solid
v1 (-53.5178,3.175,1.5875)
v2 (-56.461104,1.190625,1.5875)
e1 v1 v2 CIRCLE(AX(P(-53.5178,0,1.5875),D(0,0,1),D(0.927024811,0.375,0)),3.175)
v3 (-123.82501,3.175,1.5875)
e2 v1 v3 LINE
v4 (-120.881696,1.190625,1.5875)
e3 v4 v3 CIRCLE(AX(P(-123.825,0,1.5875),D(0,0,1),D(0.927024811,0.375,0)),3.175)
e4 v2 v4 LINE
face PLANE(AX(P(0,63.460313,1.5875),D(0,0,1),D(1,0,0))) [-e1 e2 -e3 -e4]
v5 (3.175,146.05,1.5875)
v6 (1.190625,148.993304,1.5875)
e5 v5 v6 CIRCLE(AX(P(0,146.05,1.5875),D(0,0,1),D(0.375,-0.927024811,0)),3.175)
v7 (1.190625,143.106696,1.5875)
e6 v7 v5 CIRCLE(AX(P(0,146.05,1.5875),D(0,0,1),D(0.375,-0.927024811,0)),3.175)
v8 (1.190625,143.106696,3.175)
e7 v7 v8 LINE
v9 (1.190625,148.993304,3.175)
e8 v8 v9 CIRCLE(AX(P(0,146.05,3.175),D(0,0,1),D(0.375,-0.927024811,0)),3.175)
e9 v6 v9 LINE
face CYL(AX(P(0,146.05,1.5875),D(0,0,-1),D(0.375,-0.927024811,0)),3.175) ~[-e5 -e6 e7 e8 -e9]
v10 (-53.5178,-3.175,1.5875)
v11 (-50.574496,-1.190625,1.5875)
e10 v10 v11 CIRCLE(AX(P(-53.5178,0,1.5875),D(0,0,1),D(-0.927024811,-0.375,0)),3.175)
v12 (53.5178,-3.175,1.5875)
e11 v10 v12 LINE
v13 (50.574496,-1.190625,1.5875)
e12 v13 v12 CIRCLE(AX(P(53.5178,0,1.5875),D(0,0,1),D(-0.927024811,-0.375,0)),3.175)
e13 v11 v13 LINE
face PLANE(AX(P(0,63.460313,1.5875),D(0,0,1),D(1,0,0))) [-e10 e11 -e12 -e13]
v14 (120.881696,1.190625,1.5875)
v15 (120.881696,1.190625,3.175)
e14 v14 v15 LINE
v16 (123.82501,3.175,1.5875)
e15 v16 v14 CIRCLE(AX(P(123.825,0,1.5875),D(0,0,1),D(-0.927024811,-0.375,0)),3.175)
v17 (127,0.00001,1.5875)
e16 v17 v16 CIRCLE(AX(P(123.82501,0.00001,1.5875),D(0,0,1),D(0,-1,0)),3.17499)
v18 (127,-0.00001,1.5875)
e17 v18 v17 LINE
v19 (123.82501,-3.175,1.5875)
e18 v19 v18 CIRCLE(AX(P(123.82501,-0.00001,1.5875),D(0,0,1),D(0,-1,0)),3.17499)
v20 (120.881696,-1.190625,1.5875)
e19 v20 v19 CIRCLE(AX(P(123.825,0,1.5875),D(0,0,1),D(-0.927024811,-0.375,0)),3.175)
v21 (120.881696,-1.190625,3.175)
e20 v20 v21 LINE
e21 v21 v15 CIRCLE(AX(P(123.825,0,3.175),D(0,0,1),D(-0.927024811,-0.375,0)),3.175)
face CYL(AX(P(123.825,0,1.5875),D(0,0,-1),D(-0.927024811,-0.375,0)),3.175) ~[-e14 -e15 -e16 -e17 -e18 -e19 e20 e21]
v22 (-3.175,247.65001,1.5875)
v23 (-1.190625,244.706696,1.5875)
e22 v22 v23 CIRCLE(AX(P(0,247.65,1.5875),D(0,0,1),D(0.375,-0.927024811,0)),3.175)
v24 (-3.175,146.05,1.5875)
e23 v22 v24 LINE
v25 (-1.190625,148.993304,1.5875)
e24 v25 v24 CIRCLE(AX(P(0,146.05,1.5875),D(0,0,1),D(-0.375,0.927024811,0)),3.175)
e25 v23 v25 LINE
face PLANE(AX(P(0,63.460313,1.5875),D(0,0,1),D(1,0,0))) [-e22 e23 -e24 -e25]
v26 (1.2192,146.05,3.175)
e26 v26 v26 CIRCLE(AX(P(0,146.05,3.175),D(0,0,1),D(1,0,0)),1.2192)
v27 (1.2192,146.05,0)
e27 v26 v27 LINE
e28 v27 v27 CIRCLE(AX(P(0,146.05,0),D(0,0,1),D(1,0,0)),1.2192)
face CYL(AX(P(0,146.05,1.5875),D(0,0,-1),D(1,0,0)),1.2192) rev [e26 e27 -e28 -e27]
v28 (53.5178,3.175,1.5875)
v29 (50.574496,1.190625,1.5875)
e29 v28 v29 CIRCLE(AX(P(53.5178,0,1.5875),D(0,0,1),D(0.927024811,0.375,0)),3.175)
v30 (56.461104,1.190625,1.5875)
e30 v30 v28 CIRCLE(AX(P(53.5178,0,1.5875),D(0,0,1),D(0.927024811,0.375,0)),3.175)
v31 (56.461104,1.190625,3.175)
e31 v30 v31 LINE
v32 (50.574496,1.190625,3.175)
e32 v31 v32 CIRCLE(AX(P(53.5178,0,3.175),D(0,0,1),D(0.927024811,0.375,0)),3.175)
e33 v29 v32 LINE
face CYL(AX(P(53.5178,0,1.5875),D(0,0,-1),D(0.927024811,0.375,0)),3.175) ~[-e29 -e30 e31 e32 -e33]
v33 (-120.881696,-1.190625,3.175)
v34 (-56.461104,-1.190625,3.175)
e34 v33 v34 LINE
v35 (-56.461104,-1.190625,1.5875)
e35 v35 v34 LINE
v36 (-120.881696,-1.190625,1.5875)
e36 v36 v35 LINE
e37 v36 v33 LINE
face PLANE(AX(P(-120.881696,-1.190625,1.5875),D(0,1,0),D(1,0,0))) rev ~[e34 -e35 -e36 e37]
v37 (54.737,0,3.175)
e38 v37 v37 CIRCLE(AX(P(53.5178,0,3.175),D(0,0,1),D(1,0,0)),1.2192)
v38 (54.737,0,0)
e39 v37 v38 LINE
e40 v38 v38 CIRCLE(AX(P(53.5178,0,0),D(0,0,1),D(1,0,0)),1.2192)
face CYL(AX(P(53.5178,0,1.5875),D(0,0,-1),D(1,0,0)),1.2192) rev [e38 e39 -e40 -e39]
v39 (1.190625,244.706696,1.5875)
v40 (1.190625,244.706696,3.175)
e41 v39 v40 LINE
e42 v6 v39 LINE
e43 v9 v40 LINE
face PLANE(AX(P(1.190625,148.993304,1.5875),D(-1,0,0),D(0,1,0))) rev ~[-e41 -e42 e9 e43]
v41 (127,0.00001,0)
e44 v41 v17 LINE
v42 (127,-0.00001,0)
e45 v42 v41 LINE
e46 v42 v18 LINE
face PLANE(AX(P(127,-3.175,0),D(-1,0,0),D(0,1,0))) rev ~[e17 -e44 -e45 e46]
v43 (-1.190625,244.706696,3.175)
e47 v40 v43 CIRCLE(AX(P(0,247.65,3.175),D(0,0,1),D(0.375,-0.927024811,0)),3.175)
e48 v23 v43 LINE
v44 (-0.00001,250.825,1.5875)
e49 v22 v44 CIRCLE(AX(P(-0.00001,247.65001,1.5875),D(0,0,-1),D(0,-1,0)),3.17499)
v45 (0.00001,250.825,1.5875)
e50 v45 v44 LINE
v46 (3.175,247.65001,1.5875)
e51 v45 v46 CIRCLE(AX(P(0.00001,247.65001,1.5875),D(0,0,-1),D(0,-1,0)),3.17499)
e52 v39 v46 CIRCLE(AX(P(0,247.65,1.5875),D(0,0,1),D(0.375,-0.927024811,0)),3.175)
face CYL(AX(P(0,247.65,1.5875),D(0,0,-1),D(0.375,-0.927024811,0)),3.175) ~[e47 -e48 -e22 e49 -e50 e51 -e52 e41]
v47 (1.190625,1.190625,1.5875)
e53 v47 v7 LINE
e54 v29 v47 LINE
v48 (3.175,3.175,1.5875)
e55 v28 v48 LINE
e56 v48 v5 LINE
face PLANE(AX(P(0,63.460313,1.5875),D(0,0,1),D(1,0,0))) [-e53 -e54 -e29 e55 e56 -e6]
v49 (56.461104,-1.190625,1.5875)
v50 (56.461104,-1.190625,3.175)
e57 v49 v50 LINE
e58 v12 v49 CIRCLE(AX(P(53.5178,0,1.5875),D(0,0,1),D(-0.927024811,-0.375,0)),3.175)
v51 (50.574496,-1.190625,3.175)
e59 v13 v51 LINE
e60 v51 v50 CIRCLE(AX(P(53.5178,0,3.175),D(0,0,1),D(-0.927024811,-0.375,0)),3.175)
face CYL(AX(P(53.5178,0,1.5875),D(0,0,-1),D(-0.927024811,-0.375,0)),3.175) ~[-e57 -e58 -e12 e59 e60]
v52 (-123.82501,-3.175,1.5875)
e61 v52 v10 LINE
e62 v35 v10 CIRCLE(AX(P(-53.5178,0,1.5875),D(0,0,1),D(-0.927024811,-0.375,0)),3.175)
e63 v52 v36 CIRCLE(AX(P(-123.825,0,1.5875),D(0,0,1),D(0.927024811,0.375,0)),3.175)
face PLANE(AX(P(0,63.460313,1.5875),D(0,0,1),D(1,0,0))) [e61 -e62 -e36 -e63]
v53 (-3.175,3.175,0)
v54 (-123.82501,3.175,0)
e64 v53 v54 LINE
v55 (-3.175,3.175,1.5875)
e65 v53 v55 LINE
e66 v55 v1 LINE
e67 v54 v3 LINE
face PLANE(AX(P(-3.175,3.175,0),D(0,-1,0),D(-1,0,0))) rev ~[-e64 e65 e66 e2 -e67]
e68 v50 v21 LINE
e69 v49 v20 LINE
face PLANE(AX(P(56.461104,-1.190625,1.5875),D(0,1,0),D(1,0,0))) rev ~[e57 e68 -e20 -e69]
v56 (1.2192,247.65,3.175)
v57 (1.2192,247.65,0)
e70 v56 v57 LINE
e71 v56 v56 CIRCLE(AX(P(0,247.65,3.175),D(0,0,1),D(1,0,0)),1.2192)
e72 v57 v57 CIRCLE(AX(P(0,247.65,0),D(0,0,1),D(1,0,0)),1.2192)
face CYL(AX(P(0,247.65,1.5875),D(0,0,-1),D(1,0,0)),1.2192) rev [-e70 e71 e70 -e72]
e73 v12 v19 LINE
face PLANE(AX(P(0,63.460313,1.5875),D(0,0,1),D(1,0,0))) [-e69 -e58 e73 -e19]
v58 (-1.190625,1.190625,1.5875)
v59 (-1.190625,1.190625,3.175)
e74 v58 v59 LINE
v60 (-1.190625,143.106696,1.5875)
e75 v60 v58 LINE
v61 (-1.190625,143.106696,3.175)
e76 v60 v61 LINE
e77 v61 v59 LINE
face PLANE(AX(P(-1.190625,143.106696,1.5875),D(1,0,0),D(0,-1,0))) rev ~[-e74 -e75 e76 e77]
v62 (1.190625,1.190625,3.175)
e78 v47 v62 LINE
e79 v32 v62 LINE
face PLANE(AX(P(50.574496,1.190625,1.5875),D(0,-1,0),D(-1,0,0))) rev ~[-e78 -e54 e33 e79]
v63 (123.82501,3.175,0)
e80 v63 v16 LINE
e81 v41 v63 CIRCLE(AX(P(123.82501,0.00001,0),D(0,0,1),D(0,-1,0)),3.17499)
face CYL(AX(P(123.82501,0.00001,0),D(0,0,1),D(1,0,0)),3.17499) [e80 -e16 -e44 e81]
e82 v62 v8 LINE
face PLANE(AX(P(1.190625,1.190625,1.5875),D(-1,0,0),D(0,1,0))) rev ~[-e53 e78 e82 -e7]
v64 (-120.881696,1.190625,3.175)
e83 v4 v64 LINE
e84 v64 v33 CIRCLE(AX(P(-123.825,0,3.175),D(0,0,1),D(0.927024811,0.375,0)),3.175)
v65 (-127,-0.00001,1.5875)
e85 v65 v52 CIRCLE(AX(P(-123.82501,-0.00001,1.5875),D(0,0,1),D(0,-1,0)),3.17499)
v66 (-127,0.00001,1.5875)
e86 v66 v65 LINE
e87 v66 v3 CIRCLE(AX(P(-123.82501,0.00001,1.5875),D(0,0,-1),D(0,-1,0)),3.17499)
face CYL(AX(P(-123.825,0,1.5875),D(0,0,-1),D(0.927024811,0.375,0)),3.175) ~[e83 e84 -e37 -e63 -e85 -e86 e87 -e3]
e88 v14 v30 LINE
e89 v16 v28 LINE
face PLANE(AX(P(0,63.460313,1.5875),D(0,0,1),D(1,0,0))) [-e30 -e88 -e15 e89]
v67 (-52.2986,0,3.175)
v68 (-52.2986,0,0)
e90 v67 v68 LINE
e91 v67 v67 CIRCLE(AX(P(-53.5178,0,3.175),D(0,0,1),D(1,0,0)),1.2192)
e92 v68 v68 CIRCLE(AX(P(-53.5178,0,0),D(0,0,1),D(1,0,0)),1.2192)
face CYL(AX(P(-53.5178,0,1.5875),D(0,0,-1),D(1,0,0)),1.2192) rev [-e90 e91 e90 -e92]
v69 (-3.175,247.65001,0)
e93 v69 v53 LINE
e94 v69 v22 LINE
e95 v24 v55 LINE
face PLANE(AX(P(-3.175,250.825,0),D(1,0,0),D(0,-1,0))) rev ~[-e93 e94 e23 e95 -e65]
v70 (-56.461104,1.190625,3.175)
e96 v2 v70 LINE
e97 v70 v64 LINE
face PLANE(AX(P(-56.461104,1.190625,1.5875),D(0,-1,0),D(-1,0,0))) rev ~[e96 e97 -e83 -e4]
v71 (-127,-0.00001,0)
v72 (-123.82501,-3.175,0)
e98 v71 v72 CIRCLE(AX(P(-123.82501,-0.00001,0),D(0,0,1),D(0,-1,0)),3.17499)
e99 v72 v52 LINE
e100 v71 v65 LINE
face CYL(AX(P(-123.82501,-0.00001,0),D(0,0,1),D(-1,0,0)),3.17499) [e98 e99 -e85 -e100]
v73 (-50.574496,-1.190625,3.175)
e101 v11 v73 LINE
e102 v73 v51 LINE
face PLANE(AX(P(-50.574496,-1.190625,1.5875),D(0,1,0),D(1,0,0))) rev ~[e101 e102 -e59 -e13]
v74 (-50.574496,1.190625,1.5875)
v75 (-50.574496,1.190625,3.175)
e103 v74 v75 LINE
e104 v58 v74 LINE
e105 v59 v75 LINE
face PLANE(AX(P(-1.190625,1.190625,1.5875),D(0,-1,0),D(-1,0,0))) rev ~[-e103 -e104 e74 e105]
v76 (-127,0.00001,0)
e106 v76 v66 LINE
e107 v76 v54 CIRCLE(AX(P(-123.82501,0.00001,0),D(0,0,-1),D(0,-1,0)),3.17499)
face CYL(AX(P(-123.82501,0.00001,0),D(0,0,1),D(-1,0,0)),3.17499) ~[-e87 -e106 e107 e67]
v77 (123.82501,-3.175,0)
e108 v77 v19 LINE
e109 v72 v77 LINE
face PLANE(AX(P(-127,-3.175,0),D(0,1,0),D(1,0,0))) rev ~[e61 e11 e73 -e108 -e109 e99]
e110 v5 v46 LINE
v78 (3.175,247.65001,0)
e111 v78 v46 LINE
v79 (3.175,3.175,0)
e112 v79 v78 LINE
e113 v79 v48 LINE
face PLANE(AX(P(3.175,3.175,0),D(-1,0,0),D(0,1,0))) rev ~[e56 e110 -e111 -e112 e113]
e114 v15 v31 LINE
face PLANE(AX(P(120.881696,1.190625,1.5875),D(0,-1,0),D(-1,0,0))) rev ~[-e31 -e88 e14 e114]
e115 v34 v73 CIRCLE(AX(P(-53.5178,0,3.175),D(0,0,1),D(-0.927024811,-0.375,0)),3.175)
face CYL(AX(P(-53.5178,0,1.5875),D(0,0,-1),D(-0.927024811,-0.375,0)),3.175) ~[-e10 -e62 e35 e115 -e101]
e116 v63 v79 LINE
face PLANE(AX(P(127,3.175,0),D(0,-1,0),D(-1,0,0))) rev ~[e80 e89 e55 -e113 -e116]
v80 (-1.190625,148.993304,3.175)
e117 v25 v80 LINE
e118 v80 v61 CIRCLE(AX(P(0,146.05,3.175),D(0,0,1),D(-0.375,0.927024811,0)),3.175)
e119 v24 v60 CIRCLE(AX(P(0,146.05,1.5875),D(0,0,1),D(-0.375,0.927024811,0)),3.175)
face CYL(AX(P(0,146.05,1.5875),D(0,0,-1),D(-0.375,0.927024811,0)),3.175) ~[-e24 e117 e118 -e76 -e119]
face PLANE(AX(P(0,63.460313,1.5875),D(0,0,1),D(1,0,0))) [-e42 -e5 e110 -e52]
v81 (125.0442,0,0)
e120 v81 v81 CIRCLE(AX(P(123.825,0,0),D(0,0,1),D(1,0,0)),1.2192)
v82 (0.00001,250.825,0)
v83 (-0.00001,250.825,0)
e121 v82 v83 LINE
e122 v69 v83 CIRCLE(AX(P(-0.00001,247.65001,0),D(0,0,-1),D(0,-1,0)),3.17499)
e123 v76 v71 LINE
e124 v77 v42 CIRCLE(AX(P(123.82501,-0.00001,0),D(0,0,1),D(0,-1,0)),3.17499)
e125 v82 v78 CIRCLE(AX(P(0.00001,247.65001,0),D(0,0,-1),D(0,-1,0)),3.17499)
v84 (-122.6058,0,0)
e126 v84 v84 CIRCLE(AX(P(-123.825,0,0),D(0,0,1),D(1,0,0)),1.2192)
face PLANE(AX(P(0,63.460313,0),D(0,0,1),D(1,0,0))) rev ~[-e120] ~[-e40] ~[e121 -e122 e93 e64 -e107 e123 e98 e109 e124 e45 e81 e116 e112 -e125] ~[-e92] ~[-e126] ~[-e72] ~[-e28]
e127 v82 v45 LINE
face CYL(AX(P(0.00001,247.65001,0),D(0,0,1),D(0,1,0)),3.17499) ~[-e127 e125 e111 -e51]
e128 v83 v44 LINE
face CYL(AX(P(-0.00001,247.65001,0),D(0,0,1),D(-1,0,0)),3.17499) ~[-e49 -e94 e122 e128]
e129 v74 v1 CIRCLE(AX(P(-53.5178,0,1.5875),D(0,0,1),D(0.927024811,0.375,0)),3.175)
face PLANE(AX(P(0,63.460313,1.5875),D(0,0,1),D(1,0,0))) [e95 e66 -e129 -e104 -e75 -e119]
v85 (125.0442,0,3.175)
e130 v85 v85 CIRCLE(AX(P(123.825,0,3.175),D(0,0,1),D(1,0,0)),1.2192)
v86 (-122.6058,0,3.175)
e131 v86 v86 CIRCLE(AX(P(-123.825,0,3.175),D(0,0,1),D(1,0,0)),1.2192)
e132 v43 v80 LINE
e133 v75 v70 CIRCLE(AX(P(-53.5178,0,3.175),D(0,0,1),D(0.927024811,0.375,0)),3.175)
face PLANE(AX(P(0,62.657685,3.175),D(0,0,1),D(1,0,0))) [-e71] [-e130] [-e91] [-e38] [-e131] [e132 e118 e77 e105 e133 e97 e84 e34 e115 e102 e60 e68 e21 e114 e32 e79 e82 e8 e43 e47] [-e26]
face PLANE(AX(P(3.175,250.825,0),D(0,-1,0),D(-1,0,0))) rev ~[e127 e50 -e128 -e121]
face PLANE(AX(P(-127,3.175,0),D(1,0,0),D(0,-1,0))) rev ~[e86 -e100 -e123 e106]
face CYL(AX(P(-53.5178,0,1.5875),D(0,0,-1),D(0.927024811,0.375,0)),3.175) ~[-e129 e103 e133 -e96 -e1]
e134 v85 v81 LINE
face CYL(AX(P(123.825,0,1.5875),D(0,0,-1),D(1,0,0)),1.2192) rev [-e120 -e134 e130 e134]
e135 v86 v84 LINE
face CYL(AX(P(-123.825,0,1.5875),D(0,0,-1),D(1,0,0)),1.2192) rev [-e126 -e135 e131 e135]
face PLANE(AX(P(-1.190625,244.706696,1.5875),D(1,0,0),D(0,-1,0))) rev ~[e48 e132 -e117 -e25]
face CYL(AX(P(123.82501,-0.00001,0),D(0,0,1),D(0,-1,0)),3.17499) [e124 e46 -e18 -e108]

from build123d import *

# Parameters (mm, degrees)
F0_R     = 1.2192
F1_DEPTH = 1.5875
F2_R     = 3.17499
F3_R     = 1.2192
F4_DEPTH = 1.5875


# Not quite as in the source:
# - a fillet or chamfer is up to 0.001 mm smaller than in the source, because OpenCascade refuses the exact size


with BuildPart() as f1:
    # F0 (on Top) → F1 (new body)
    with BuildSketch(Plane.XY):
        Polygon((-127, 3.175), (-127, -3.175), (127, -3.175), (127, 3.175), (3.175, 3.175), (3.175, 250.825), (-3.175, 250.825), (-3.175, 3.175), align=None)
        with Locations((-123.825, 0)):
            Circle(F0_R, mode=Mode.SUBTRACT)
        with Locations((-53.5178, 0)):
            Circle(F0_R, mode=Mode.SUBTRACT)
        with Locations((53.5178, 0)):
            Circle(F0_R, mode=Mode.SUBTRACT)
        with Locations((123.825, 0)):
            Circle(F0_R, mode=Mode.SUBTRACT)
        with Locations((0, 146.05)):
            Circle(F0_R, mode=Mode.SUBTRACT)
        with Locations((0, 247.65)):
            Circle(F0_R, mode=Mode.SUBTRACT)
    extrude(amount=F1_DEPTH)

    # F2 (radius 3.175 in the source; OpenCascade refuses exactly that, so slightly less here)
    f2_edges = [f1.edges().sort_by_distance(p)[0] for p in [
        (-127, -3.175, 0.79375),
        (-127, 3.175, 0.79375),
        (127, 3.175, 0.79375),
        (127, -3.175, 0.79375),
        (-3.175, 250.825, 0.79375),
        (3.175, 250.825, 0.79375),
    ]]
    fillet(f2_edges, radius=F2_R)

    # F3 (on face) → F4 (join)
    with BuildSketch(Plane.XY.offset(1.5875)):
        with BuildLine():
            Line((-56.4611037746, 1.190625), (-120.8816962254, 1.190625))
            ThreePointArc((-120.8816962254, 1.190625), (-127, 0), (-120.8816962254, -1.190625))
            Line((-120.8816962254, -1.190625), (-56.4611037746, -1.190625))
            ThreePointArc((-56.4611037746, -1.190625), (-53.5178, -3.175), (-50.5744962254, -1.190625))
            Line((-50.5744962254, -1.190625), (50.5744962254, -1.190625))
            ThreePointArc((50.5744962254, -1.190625), (53.5178, -3.175), (56.4611037746, -1.190625))
            Line((56.4611037746, -1.190625), (120.8816962254, -1.190625))
            ThreePointArc((120.8816962254, -1.190625), (127, 0), (120.8816962254, 1.190625))
            Line((120.8816962254, 1.190625), (56.4611037746, 1.190625))
            ThreePointArc((56.4611037746, 1.190625), (53.5178, 3.175), (50.5744962254, 1.190625))
            Line((50.5744962254, 1.190625), (1.190625, 1.190625))
            Line((1.190625, 1.190625), (1.190625, 143.1066962254))
            ThreePointArc((1.190625, 143.1066962254), (3.175, 146.05), (1.190625, 148.9933037746))
            Line((1.190625, 148.9933037746), (1.190625, 244.7066962254))
            ThreePointArc((1.190625, 244.7066962254), (0, 250.825), (-1.190625, 244.7066962254))
            Line((-1.190625, 244.7066962254), (-1.190625, 148.9933037746))
            ThreePointArc((-1.190625, 148.9933037746), (-3.175, 146.05), (-1.190625, 143.1066962254))
            Line((-1.190625, 143.1066962254), (-1.190625, 1.190625))
            Line((-1.190625, 1.190625), (-50.5744962254, 1.190625))
            ThreePointArc((-50.5744962254, 1.190625), (-53.5178, 3.175), (-56.4611037746, 1.190625))
        make_face()
        with Locations((-123.825, 0)):
            Circle(F3_R, mode=Mode.SUBTRACT)
        with Locations((-53.5178, 0)):
            Circle(F3_R, mode=Mode.SUBTRACT)
        with Locations((53.5178, 0)):
            Circle(F3_R, mode=Mode.SUBTRACT)
        with Locations((123.825, 0)):
            Circle(F3_R, mode=Mode.SUBTRACT)
        with Locations((0, 146.05)):
            Circle(F3_R, mode=Mode.SUBTRACT)
        with Locations((0, 247.65)):
            Circle(F3_R, mode=Mode.SUBTRACT)
    extrude(amount=F4_DEPTH)


solid = f1.part
